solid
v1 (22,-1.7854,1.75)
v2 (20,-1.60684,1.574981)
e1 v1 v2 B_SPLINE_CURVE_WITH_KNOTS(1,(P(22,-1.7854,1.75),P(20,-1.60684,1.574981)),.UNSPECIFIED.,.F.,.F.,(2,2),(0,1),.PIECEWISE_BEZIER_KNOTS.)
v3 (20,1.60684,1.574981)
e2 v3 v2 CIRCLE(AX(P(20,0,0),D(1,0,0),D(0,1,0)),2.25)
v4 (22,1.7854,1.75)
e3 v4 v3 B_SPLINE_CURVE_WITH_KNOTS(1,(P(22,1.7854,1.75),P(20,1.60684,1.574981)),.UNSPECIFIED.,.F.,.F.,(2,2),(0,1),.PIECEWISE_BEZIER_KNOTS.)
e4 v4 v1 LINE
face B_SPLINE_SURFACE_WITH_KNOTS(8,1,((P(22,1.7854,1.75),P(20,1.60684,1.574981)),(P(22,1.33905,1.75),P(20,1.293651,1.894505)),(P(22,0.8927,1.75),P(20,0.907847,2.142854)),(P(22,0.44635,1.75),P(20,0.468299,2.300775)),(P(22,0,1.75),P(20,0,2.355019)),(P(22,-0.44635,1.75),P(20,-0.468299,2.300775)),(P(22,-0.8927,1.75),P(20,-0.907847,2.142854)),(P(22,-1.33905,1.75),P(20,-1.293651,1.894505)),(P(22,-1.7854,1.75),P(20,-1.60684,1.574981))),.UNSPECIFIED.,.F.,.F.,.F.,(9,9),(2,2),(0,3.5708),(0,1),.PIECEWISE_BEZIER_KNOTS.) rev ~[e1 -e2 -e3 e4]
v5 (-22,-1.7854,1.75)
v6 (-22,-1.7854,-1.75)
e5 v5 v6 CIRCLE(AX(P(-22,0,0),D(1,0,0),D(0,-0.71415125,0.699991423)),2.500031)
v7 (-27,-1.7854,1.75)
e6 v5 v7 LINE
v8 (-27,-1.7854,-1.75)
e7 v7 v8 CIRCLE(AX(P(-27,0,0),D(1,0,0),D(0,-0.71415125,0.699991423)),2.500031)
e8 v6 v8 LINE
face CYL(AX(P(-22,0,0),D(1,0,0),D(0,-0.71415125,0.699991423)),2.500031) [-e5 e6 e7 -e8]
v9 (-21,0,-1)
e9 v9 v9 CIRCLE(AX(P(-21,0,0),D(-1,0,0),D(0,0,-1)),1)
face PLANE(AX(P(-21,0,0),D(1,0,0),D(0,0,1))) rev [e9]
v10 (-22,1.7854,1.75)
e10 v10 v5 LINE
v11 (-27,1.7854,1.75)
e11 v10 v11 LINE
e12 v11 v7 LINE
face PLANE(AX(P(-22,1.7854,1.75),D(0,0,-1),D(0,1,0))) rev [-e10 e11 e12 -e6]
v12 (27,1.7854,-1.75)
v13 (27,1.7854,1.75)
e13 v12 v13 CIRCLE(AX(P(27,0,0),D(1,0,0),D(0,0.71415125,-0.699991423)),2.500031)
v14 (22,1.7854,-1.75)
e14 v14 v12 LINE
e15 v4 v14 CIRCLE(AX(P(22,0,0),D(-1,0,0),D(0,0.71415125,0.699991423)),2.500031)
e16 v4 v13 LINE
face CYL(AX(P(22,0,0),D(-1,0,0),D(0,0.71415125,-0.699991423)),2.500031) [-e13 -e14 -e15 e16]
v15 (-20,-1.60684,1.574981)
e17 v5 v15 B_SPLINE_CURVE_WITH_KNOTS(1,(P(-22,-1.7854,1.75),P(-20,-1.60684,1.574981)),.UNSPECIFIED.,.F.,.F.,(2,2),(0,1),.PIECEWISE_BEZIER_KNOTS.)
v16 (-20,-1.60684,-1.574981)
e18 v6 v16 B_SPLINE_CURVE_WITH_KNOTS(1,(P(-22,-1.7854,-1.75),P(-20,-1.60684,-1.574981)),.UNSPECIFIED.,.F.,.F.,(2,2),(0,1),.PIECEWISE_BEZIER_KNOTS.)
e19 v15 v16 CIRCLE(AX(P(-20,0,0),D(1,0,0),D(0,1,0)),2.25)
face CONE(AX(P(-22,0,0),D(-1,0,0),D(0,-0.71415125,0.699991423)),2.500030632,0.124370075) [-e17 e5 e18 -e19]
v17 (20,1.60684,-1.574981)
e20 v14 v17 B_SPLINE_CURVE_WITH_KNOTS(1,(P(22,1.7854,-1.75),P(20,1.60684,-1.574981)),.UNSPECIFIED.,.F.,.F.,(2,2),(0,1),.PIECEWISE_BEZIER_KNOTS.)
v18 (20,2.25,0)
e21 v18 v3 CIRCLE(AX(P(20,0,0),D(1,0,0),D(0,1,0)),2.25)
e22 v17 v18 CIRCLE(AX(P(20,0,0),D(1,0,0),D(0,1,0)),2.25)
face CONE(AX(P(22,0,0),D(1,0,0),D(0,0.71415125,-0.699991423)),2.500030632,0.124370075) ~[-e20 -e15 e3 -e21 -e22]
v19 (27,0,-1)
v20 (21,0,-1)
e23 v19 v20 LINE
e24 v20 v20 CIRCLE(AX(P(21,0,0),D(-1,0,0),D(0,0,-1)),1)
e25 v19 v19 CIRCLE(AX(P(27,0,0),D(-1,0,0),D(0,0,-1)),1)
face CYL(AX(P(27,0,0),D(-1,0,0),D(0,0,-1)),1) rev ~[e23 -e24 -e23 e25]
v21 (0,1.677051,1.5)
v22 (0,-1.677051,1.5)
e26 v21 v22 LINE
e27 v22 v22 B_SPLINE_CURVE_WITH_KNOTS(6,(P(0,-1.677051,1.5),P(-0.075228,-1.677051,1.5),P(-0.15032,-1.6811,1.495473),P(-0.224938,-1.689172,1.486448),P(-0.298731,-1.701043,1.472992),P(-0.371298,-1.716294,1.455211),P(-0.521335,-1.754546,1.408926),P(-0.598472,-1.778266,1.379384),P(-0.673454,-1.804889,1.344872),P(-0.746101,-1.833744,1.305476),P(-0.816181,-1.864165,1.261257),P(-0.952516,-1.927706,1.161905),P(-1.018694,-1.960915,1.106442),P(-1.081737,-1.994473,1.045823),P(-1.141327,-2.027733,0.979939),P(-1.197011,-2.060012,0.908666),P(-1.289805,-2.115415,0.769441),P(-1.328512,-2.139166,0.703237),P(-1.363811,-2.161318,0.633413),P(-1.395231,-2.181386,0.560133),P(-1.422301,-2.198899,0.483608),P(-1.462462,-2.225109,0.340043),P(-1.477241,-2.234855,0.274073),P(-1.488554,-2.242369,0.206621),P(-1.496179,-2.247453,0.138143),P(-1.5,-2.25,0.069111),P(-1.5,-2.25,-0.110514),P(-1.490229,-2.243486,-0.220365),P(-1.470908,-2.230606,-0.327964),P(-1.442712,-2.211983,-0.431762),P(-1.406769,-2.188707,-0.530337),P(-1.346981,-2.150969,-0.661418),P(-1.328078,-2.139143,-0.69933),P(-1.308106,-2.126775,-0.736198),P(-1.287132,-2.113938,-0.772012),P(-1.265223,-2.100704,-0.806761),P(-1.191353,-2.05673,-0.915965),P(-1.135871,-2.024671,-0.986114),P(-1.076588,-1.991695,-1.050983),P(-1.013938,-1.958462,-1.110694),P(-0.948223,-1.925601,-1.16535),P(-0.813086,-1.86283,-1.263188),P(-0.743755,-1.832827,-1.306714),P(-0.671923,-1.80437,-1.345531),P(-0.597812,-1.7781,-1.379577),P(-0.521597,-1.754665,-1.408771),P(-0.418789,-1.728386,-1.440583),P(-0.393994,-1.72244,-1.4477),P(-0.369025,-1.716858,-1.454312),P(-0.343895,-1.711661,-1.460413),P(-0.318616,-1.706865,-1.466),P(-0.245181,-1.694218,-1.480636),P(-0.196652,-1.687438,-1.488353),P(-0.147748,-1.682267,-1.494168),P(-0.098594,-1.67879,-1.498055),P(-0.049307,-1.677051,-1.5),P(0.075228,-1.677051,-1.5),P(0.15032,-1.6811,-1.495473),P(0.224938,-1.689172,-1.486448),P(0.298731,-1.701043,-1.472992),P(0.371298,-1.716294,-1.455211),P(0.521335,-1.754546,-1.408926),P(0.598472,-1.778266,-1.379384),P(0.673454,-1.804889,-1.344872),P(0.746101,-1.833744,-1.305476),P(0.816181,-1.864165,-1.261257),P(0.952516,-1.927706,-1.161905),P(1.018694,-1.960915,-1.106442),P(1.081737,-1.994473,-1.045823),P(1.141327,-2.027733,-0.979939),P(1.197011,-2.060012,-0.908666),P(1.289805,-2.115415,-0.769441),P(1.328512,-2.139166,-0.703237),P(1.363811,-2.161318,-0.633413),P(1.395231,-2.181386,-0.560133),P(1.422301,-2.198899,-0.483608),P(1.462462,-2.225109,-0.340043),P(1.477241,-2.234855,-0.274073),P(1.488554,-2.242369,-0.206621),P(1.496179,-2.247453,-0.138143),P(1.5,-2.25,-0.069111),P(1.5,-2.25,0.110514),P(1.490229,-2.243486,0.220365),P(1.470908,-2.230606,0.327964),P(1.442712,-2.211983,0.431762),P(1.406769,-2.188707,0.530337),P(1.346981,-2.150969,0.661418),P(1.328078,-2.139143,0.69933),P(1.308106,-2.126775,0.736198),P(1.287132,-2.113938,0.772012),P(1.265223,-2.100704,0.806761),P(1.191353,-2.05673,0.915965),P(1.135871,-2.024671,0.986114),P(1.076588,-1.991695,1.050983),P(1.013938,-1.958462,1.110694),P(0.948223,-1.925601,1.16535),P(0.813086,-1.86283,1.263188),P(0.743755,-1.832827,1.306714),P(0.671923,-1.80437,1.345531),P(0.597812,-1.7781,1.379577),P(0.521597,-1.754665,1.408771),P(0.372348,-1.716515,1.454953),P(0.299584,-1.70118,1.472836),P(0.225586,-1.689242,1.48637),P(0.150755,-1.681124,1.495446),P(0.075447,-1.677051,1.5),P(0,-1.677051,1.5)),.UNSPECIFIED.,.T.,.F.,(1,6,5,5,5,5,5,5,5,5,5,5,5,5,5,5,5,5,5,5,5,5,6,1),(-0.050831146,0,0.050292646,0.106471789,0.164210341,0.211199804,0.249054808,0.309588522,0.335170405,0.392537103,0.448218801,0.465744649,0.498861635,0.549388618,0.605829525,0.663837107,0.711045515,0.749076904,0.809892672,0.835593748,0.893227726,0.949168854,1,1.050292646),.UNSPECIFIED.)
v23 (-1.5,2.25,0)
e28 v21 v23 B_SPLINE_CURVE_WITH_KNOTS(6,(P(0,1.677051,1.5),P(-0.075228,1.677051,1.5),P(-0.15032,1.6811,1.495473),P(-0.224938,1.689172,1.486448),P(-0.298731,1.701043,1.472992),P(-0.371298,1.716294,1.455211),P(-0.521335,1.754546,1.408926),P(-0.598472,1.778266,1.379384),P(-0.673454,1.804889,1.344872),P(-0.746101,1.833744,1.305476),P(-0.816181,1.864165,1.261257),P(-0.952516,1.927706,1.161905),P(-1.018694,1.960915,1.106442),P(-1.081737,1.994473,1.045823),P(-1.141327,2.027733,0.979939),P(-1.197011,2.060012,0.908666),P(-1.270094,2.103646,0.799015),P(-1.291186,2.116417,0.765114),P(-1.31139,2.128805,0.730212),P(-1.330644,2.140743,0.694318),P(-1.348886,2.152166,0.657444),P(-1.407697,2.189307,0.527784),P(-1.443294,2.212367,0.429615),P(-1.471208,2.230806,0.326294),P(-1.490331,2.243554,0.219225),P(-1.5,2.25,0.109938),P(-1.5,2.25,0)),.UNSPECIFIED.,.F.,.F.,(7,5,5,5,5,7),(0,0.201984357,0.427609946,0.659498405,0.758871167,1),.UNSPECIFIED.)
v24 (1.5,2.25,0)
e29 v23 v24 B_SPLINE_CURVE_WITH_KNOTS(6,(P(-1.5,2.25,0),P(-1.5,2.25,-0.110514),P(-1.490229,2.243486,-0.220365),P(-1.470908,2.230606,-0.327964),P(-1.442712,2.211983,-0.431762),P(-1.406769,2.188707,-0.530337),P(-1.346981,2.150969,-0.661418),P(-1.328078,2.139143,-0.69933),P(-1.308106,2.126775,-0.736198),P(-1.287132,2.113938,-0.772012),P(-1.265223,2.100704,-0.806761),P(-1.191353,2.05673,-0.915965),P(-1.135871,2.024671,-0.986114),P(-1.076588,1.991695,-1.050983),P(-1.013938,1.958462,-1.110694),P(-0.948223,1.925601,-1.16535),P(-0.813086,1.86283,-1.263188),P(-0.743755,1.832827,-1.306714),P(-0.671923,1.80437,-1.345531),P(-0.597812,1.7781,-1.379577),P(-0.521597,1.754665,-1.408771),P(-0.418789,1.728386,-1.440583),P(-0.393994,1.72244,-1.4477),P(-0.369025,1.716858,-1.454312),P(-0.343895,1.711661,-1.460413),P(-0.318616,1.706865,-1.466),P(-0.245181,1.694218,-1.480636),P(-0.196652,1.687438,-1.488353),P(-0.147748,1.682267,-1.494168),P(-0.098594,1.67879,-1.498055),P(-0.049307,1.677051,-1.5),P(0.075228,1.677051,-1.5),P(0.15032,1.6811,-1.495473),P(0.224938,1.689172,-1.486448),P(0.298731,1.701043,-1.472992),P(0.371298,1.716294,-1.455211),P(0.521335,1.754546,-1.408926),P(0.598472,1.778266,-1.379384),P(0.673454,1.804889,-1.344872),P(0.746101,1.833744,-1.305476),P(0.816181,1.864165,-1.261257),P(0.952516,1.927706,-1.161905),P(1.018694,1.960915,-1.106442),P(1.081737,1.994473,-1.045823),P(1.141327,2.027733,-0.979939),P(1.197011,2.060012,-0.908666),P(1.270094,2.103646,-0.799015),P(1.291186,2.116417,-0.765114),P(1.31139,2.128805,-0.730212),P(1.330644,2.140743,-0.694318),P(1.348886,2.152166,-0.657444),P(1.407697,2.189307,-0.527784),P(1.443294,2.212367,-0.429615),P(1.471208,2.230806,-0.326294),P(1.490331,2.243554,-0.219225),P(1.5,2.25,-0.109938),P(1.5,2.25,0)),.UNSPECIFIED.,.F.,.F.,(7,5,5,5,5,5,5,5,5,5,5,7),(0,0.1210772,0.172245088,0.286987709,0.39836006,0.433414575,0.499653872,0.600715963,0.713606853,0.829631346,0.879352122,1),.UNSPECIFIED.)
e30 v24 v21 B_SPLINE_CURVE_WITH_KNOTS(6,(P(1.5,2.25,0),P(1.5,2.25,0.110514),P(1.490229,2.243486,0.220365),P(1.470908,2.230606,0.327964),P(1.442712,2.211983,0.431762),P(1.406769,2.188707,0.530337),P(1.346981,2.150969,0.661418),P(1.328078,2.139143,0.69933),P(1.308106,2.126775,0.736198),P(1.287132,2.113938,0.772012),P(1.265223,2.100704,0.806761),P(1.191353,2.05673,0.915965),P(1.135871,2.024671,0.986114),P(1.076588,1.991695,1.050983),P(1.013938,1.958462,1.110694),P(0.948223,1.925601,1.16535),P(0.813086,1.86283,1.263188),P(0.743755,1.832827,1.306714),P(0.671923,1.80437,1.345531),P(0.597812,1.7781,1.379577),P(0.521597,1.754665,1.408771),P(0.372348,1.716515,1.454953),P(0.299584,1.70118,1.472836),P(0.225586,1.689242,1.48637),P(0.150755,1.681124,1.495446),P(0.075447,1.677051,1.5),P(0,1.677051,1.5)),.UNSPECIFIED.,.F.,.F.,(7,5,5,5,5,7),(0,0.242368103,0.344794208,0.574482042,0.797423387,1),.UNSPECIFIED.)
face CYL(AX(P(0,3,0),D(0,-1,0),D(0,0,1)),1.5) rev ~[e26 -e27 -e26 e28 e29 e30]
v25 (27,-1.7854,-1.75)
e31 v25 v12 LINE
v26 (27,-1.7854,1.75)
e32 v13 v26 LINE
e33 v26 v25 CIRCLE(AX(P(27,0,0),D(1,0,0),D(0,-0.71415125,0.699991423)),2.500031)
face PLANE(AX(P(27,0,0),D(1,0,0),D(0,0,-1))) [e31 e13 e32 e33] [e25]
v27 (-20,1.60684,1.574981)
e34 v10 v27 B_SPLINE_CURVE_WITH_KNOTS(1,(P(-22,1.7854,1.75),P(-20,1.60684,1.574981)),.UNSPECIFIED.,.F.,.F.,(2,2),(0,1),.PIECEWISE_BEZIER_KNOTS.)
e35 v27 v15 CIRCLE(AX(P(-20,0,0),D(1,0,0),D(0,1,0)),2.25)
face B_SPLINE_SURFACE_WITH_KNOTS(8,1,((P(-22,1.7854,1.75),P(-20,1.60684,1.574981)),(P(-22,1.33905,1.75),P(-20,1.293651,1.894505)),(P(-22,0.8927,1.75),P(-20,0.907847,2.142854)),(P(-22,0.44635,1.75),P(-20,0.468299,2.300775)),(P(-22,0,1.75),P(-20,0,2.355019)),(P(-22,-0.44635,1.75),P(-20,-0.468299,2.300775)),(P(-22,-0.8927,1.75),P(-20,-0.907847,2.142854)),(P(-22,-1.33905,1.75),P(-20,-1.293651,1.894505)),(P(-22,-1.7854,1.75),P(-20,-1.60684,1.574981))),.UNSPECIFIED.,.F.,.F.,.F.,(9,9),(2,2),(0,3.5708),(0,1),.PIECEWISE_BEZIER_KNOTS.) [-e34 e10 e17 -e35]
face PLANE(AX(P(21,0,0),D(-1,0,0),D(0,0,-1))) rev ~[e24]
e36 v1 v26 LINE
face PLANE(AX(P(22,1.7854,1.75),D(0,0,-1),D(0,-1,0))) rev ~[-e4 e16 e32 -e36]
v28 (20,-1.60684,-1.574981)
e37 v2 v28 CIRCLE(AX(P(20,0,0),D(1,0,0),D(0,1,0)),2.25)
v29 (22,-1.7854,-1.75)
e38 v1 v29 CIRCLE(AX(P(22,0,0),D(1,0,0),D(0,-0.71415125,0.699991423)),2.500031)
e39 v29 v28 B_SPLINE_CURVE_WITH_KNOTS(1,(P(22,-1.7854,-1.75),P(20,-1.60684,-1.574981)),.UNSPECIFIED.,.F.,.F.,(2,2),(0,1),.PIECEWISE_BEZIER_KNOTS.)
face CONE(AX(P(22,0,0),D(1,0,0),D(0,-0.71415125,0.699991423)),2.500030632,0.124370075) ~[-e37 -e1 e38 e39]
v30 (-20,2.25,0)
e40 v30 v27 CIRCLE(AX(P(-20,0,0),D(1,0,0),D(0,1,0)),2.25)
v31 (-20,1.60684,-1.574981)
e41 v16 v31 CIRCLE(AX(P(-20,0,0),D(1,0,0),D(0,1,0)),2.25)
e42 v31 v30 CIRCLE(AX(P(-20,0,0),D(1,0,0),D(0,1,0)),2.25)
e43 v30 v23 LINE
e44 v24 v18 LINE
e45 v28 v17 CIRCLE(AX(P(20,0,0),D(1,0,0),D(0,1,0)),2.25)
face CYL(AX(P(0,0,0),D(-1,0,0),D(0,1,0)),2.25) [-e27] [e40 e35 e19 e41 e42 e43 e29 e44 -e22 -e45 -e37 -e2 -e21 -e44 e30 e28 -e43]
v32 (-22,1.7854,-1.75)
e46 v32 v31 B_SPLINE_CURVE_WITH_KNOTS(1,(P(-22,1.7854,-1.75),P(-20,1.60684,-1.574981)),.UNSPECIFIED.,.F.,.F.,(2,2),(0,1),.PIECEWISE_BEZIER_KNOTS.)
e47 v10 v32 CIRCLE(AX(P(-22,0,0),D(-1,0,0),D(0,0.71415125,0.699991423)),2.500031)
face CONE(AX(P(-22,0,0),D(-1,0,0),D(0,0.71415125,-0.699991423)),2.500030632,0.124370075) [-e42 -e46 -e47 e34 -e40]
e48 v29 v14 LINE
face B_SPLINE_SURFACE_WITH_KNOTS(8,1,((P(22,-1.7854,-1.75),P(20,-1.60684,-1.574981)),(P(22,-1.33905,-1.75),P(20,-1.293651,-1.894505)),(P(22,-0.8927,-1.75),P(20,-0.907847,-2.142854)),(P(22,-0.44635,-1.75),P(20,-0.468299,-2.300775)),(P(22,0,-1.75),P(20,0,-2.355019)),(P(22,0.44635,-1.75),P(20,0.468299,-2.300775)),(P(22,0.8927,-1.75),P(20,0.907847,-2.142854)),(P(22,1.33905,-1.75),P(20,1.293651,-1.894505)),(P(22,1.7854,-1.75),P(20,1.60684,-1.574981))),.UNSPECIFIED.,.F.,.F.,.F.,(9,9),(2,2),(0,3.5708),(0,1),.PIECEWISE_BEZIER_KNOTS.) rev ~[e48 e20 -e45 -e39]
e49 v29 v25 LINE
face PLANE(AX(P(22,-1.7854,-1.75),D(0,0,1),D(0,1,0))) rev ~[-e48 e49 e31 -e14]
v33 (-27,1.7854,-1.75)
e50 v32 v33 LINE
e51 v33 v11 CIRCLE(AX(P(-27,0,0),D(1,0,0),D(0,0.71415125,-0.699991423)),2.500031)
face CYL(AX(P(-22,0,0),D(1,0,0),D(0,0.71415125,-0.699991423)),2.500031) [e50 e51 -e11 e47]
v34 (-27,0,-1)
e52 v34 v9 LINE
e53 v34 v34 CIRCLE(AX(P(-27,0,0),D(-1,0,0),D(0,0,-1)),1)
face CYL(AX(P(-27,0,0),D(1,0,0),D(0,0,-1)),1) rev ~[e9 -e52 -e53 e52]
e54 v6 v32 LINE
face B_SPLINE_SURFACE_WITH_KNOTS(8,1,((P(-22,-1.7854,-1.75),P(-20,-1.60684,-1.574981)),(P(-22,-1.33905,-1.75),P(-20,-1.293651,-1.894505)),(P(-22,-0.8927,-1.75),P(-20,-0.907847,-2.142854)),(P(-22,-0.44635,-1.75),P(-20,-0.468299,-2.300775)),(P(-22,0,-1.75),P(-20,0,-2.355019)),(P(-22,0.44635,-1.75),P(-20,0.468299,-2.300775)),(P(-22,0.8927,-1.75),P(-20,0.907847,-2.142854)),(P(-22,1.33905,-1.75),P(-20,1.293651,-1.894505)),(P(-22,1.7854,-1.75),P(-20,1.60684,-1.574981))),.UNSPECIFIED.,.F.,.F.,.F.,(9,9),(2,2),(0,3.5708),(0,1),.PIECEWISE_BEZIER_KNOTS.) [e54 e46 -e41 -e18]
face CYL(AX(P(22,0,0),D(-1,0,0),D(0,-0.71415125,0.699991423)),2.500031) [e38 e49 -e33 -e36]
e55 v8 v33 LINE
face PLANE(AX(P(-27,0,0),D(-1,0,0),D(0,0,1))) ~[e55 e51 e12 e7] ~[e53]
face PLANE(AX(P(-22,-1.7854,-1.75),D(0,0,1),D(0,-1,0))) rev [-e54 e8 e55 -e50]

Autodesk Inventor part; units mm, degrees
ref_plane "YZ Plane" through (0, 0, 0) normal (1, 0, 0) x (0, 1, 0)
sketch "Sketch1" plane through (0, 0, 0) normal (1, 0, 0) x (0, 1, 0)
  circle A0 centre (0, 0) radius 2.25
  dimension "diameter" = 4.5
extrude "Extrusion1" add sketch "Sketch1" along normal blind 20
ref_plane "Work Plane1" through (22, 0, 0) normal (1, 0, 0) x (0, 0, -1)
sketch "Sketch3" plane through (22, 0, 0) normal (1, 0, 0) x (0, 0, -1)
  arc A0 (-1.75, 1.7854) -> (-1.75, -1.7854) centre (0, 0) ccw construction
  line L0 (-1.75, -1.7854) -> (1.75, -1.7854) construction
  line L1 (1.75, -1.7854) -> (1.75, 1.7854)
  line L2 (1.75, 1.7854) -> (-1.75, 1.7854) construction
  line L3 (-1.75, 1.7854) -> (-1.75, -1.7854)
  line L4 (-1.75, -1.7854) -> (1.75, 1.7854) construction
  line L5 (1.75, -1.7854) -> (0, 0) construction
  arc A1 (1.75, 1.7854) -> (-1.75, 1.7854) centre (0, 0) ccw
  arc A2 (1.75, -1.7854) -> (1.75, 1.7854) centre (0, 0) ccw construction
  arc A3 (-1.75, -1.7854) -> (1.75, -1.7854) centre (0, 0) ccw
  line L6 (0, 0) -> (-1.75, 1.7854) construction
  dimension "d23" = 5
  dimension "d34" = 3.5
extrude "Extrusion3" add sketch "Sketch3" along normal blind 5
loft "Loft1" add section 1 edges at (22, 2.5, 0) (22, 0, -1.75) (22, -2.5, 0) (22, 0, 1.75) section 2 edges at (20, -2.25, 0)
sketch "Sketch4" plane through (27, 0, 0) normal (1, 0, 0) x (0, 0, -1)
  arc A0 (1.75, 1.7854) -> (-1.75, 1.7854) centre (0, 0) ccw projected
hole "Hole1" at (27, 0, 0) direction (-1, 0, 0) diameter 2 depth 6
mirror "Mirror1" about plane through (0, 0, 0) normal (-1, 0, 0)
ref_plane "Work Plane2" through (0, 5, 0) normal (0, 1, 0) x (-1, 0, 0)
sketch "Sketch5" plane through (0, 5, 0) normal (0, 1, 0) x (-1, 0, 0)
  point P0 (0, 0)
  point P1 (0, 0)
hole "Hole2" at (0, 5, 0) direction (0, -1, 0) diameter 3 end through all counterbore diameter 6 counterbore depth 2
properties part number "front shaft v2"
